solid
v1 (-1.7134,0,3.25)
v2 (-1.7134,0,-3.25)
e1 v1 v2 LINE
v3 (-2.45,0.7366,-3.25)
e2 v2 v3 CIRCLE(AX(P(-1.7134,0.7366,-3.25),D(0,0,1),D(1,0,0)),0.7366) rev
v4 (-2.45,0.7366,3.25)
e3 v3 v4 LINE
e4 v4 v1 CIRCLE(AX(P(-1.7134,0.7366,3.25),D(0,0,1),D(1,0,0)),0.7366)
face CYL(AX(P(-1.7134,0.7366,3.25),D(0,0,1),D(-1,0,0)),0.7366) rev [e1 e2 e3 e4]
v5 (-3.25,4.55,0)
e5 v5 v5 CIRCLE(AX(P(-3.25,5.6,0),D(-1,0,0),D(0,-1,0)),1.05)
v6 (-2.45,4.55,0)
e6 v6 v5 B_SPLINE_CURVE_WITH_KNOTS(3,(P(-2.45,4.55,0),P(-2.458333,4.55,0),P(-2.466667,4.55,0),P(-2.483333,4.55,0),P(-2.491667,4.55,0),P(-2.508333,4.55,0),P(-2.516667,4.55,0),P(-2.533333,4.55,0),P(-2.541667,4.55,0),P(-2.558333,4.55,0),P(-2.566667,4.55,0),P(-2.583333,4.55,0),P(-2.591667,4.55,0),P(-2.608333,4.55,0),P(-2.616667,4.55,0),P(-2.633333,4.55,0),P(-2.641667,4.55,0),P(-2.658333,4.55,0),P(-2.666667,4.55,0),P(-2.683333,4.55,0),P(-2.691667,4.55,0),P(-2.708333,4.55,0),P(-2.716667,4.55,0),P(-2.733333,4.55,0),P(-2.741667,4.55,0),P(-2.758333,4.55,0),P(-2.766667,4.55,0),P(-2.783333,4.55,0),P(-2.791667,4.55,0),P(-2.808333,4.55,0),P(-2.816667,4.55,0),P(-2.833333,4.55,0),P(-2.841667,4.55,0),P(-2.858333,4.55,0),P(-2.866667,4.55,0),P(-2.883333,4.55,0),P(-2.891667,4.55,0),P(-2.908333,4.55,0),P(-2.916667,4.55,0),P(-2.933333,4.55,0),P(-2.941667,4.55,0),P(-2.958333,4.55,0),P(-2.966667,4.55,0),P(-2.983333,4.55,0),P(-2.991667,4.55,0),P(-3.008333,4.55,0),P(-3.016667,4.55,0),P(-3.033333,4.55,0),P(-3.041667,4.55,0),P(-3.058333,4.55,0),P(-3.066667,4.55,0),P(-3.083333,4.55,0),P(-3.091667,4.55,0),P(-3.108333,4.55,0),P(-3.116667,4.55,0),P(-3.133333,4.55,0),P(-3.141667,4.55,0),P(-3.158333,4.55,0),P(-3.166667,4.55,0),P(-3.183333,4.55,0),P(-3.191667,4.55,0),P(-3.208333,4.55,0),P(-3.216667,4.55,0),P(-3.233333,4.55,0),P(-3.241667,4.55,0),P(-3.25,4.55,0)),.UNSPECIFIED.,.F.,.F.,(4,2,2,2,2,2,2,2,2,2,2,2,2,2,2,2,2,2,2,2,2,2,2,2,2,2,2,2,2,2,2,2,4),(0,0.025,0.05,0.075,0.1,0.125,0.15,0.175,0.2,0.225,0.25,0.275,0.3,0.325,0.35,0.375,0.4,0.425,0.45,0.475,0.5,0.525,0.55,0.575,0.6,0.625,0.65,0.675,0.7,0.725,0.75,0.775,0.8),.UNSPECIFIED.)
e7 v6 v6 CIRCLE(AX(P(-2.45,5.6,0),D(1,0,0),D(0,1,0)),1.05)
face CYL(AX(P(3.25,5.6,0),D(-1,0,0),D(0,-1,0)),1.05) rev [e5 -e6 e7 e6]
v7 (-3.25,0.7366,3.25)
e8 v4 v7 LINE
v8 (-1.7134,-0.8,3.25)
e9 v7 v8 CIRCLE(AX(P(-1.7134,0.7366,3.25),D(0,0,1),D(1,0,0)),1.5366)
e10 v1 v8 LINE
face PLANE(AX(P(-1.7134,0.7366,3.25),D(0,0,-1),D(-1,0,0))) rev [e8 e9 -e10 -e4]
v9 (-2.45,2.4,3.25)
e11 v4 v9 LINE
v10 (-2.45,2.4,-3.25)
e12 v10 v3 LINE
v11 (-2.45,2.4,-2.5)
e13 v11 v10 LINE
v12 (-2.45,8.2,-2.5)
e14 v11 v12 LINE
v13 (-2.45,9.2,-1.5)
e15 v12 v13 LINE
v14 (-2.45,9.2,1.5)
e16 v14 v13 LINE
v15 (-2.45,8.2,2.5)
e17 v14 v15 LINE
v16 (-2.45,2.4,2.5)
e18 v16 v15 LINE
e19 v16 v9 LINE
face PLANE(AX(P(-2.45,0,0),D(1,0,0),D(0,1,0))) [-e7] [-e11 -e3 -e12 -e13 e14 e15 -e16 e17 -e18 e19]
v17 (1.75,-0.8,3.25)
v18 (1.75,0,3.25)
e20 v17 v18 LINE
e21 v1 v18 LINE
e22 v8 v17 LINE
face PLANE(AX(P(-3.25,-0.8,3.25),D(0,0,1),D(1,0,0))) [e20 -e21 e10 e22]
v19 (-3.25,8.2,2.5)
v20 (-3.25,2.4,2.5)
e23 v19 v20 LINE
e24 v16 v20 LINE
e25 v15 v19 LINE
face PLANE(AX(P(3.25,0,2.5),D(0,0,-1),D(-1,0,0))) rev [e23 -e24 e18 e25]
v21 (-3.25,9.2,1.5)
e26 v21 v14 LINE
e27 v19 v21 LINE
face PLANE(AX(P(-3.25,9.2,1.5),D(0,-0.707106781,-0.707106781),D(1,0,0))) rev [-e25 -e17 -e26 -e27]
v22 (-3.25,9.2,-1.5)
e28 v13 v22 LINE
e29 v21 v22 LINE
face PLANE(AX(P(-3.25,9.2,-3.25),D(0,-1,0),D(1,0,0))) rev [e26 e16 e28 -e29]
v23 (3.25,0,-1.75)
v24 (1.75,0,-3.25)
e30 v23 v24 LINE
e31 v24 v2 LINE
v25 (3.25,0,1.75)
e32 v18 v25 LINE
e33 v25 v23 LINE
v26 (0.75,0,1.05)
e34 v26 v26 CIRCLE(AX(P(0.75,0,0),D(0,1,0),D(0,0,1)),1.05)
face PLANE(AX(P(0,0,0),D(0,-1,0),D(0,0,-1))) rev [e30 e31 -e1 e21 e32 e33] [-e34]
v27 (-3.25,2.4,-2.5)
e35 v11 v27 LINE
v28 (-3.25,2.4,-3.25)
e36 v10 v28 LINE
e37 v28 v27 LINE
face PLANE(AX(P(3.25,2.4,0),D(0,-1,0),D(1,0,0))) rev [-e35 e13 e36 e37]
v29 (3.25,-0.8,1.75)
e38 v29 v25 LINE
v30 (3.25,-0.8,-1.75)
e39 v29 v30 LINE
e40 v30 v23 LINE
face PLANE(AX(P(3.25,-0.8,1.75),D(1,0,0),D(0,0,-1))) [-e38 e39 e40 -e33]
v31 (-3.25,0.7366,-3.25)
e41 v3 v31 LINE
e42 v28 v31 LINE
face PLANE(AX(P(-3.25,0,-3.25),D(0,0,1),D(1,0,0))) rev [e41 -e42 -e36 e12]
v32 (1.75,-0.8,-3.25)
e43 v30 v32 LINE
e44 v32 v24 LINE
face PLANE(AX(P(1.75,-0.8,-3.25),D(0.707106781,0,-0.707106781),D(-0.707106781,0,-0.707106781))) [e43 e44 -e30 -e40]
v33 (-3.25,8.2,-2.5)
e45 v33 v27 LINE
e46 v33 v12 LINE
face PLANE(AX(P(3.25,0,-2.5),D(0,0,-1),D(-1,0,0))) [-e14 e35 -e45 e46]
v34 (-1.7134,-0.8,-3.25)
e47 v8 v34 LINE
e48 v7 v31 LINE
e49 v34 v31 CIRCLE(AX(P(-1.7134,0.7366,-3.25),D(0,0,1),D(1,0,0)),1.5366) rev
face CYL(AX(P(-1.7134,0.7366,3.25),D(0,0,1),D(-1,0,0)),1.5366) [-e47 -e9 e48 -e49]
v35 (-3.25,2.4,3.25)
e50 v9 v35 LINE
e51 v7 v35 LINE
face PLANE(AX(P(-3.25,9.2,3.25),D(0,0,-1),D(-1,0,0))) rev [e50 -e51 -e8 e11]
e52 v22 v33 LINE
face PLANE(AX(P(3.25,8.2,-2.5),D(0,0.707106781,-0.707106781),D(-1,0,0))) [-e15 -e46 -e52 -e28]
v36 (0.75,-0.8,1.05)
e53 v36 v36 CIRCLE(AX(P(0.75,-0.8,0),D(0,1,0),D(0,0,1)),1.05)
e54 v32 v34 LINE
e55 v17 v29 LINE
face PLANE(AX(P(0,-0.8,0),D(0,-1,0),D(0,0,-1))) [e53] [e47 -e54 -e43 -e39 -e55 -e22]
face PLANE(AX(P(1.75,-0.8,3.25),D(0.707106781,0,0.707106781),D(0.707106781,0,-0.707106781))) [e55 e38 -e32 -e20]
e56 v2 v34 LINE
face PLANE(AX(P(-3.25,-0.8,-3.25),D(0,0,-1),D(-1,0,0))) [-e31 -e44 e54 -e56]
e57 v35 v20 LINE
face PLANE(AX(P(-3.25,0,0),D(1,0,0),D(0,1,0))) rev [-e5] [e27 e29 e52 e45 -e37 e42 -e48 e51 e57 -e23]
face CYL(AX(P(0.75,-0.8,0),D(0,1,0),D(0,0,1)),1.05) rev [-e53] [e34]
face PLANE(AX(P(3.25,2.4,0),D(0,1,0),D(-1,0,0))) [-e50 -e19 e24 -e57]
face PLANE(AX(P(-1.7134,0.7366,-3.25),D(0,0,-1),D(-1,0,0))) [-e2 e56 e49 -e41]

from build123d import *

# Parameters (mm, degrees)
BASE_FLANGE1_DEPTH           = 0.8
EDGE_FLANGE1_STRIP_W         = 4.6732
EDGE_FLANGE1_STRIP_H         = 0.8
EDGE_FLANGE1_STRIP_CUT_DEPTH = 6.5
EDGE_FLANGE1_DEPTH           = 6.5
SKETCH10_W                   = 0.75
SKETCH10_H                   = 6.8
SKETCH10_R                   = 1.05
CUT_EXTRUDE1_DEPTH           = 12.724013818
BREAK_CORNER1_START          = 7.566042559
BREAK_CORNER1_OUTLINE_W      = 4
BREAK_CORNER1_OUTLINE_H      = 4.566042559
BREAK_CORNER1_DEPTH          = 0.707106781
BREAK_CORNER1_START_2        = 4.030508653
BREAK_CORNER1_2_OUTLINE_W    = 4
BREAK_CORNER1_2_OUTLINE_H    = 1.433957441
BREAK_CORNER1_2_DEPTH        = 1.414213562
SKETCH11_R                   = 1.05
CUT_EXTRUDE2_DEPTH           = 11.2842112


# Read off the part's stored shape, not the designer's step: Break-Corner1
# Sheet-metal steps are written as plain solids
with BuildPart() as part:
    # Sketch1 → Base-Flange1 (new body)
    with BuildSketch(Plane(origin=(0, 0, 0), x_dir=(1, 0, 0), z_dir=(0, 1, 0))):
        Polygon((1.75, 3.25), (3.25, 1.75), (3.25, -1.75), (1.75, -3.25), (-3.25, -3.25), (-3.25, 3.25), align=None)
    extrude(amount=-BASE_FLANGE1_DEPTH)

    # Edge-Flange1 strip (across the edge) → Edge-Flange1 strip cut (cut)
    with BuildSketch(Plane(origin=(-3.25, 0, -3.25), x_dir=(1, 0, 0), z_dir=(0, 0, 1))):
        with Locations((-0.8, -0.4)):
            Rectangle(EDGE_FLANGE1_STRIP_W, EDGE_FLANGE1_STRIP_H)
    extrude(amount=EDGE_FLANGE1_STRIP_CUT_DEPTH, mode=Mode.SUBTRACT)

    # Edge-Flange1 section (across the edge) → Edge-Flange1 (add)
    with BuildSketch(Plane(origin=(-3.25, 0, -3.25), x_dir=(1, 0, 0), z_dir=(0, 0, 1))):
        with BuildLine():
            Line((0, 0.7366), (0, 9.2))
            Line((0, 9.2), (0.8, 9.2))
            Line((0.8, 9.2), (0.8, 0.7366))
            ThreePointArc((0.8, 0.7366), (1.015745145, 0.215745145), (1.5366, 0))
            Line((1.5366, 0), (1.5366, -0.8))
            ThreePointArc((1.5366, -0.8), (0.45005972, -0.34994028), (0, 0.7366))
        make_face()
    extrude(amount=EDGE_FLANGE1_DEPTH)

    # Sketch10 → Cut-Extrude1 (cut, through all)
    with BuildSketch(Plane.ZY.offset(3.25)):
        with Locations((-2.875, 5.8)):
            Rectangle(SKETCH10_W, SKETCH10_H)
        with Locations((2.875, 5.8)):
            Rectangle(SKETCH10_W, SKETCH10_H)
        with Locations(Location((0, 5.6, 0), (0, 0, 270))):
            Circle(SKETCH10_R)
    extrude(amount=-CUT_EXTRUDE1_DEPTH, mode=Mode.SUBTRACT)

    # Break-Corner1 outline → Break-Corner1 (cut)
    with BuildSketch(Plane(origin=(0, 0, 0), x_dir=(1, 0, 0), z_dir=(0, 0.707106781186547, -0.707106781186548)).offset(BREAK_CORNER1_START)):
        with Locations((-3, -5.283021279)):
            Rectangle(BREAK_CORNER1_OUTLINE_W, BREAK_CORNER1_OUTLINE_H)
    extrude(amount=BREAK_CORNER1_DEPTH, mode=Mode.SUBTRACT)

    # Break-Corner1 2 outline → Break-Corner1 2 (cut)
    with BuildSketch(Plane(origin=(0, 0, 0), x_dir=(1, 0, 0), z_dir=(0, 0.707106781186547, -0.707106781186548)).offset(BREAK_CORNER1_START_2)):
        with Locations((-3, -8.283021279)):
            Rectangle(BREAK_CORNER1_2_OUTLINE_W, BREAK_CORNER1_2_OUTLINE_H)
    extrude(amount=BREAK_CORNER1_2_DEPTH, mode=Mode.SUBTRACT)

    # Sketch11 → Cut-Extrude2 (cut, through all)
    with BuildSketch(Plane(origin=(0, 0, 0), x_dir=(1, 0, 0), z_dir=(0, 1, 0))):
        with Locations(Location((0.75, 0, 0), (0, 0, 270))):
            Circle(SKETCH11_R)
    extrude(amount=-CUT_EXTRUDE2_DEPTH, mode=Mode.SUBTRACT)


solid = part.part
